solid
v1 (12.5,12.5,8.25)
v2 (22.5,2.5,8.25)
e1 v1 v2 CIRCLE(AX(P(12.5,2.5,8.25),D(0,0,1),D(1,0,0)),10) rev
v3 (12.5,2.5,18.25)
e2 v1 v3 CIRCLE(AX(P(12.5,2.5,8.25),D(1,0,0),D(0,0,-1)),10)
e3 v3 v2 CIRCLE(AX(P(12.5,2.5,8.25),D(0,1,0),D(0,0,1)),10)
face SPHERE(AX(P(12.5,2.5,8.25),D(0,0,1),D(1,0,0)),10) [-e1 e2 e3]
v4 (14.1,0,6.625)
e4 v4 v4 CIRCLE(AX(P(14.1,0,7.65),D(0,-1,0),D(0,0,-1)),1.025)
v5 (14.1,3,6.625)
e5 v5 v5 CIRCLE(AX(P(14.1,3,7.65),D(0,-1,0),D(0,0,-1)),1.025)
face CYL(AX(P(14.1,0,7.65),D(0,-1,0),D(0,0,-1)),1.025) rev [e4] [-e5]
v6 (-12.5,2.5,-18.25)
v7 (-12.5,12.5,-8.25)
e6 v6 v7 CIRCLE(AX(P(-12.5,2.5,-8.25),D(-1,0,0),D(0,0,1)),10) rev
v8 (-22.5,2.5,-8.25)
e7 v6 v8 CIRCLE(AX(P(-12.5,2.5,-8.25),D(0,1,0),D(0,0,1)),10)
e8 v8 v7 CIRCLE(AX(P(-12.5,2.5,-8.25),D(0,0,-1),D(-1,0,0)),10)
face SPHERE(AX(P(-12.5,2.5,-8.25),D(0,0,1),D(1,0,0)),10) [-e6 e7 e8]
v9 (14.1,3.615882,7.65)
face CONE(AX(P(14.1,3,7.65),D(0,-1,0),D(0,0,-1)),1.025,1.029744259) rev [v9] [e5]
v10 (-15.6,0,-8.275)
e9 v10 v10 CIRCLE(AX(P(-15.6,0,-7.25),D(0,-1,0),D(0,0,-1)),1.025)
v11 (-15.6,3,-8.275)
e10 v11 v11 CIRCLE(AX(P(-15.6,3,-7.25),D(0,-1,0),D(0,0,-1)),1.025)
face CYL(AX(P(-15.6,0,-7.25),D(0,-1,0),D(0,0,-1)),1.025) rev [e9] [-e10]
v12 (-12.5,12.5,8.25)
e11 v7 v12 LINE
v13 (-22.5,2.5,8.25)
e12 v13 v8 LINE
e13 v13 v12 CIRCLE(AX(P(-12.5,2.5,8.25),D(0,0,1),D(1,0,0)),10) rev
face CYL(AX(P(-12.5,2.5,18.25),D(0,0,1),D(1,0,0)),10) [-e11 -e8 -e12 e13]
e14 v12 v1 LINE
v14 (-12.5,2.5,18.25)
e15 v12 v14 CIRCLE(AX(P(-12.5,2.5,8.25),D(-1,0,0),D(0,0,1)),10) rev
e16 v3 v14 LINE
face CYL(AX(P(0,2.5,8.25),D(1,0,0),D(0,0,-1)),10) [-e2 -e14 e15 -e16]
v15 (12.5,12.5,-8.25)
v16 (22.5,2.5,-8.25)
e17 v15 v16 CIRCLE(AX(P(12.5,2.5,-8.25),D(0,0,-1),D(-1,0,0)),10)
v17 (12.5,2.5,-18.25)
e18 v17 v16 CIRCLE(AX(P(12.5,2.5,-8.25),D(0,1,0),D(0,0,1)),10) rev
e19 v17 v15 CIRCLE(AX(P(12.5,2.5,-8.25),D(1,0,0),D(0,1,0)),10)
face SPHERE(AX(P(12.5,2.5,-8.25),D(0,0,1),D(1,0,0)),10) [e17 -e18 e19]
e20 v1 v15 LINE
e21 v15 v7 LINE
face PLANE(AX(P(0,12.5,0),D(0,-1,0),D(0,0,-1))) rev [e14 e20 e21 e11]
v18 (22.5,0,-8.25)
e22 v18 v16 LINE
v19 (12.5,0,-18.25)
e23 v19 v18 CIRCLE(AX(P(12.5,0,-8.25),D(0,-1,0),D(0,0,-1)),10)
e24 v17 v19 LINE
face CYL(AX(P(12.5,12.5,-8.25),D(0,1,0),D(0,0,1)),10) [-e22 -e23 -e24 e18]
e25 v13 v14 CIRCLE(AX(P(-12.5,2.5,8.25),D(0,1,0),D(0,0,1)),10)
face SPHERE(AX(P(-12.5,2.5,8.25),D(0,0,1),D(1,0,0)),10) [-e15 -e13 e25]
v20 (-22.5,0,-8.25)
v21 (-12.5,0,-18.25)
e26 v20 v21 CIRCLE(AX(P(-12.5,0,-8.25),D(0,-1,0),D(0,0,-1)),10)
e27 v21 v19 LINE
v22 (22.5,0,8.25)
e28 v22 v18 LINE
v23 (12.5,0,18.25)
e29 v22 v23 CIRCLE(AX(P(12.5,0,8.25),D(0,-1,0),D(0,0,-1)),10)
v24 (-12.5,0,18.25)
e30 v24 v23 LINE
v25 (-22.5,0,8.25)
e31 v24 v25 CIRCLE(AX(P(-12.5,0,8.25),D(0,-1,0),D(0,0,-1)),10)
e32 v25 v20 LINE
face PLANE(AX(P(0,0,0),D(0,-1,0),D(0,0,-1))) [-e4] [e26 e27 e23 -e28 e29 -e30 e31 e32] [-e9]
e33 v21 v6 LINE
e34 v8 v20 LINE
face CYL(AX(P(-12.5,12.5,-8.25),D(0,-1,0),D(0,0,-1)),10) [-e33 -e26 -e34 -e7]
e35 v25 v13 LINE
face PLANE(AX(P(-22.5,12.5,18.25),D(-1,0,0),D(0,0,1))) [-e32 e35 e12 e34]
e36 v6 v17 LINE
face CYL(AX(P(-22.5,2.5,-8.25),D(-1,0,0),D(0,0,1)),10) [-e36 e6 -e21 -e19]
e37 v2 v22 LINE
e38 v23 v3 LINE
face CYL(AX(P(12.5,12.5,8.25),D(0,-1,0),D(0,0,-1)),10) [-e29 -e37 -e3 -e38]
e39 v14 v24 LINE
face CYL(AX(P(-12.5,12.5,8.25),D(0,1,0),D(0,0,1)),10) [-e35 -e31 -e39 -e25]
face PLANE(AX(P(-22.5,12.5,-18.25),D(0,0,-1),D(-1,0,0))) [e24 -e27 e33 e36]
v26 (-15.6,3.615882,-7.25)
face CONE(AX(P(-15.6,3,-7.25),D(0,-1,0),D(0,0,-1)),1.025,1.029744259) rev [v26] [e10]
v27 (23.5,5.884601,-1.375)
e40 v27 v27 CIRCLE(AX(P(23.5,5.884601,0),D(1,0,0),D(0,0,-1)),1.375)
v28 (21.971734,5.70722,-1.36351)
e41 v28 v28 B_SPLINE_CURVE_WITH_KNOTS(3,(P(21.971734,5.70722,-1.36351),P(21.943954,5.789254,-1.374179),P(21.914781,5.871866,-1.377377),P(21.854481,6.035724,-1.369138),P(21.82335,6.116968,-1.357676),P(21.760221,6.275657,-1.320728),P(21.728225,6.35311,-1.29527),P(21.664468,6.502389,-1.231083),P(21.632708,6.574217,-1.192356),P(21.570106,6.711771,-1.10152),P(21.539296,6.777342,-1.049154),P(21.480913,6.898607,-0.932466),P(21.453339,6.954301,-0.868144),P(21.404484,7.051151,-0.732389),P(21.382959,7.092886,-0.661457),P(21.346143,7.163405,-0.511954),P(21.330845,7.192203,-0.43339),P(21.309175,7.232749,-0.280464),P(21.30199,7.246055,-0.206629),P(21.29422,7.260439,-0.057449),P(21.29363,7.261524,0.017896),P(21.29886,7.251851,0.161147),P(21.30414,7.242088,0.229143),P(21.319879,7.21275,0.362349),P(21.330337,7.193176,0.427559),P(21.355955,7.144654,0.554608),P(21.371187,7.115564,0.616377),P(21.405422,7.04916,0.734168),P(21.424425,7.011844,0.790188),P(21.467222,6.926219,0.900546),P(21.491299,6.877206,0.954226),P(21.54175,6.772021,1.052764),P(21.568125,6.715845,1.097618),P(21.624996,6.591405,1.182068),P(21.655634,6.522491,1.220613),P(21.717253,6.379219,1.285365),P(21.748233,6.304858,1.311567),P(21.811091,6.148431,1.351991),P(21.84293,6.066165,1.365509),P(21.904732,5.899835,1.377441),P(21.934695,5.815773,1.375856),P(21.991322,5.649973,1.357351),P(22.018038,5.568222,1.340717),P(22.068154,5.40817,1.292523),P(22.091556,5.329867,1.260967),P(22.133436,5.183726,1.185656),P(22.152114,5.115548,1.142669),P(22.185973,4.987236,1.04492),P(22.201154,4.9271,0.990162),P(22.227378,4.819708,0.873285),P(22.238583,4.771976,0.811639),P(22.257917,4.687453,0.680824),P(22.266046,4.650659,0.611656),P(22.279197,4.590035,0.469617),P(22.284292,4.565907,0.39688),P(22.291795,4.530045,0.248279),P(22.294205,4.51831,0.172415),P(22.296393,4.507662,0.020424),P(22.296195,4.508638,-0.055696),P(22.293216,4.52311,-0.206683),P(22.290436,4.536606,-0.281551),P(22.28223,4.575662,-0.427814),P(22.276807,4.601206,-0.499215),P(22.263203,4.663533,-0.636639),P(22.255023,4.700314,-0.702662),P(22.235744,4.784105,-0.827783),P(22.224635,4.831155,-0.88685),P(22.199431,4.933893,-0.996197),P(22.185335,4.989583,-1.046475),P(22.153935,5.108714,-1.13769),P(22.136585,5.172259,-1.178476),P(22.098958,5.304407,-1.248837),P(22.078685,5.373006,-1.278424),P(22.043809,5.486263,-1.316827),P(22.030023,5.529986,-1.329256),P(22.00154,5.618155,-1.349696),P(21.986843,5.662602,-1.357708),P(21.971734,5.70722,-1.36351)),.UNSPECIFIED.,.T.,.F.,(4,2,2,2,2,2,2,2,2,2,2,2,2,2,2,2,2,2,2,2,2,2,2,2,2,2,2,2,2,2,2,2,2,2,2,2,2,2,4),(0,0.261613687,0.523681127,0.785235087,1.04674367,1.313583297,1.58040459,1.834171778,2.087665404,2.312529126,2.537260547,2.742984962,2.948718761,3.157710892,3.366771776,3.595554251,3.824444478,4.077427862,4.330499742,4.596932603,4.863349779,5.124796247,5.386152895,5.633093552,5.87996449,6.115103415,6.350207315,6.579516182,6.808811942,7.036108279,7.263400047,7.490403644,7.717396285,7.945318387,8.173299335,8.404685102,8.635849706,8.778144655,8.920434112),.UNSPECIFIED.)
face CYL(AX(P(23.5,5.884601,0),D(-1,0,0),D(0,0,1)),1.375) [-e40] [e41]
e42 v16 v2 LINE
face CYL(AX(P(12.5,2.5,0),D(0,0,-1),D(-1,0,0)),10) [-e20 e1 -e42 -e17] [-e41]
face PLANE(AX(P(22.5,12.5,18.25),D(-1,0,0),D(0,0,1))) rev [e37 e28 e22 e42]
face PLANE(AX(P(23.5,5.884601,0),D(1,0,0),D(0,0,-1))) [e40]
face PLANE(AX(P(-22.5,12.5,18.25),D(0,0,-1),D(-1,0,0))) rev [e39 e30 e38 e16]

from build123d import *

# Parameters (mm, degrees)
SKETCH1_W                          = 45
SKETCH1_H                          = 36.5
BOSS_EXTRUDE1_DEPTH                = 12.5
SKETCH2_R                          = 1.375
BOSS_EXTRUDE2_DEPTH                = 1
TAP_DRILL_FOR_M2_5X0_45_TAP1_D     = 2.05
TAP_DRILL_FOR_M2_5X0_45_TAP1_DEPTH = 3
TAP_DRILL_FOR_M2_5X0_45_TAP1_TIP   = 0.615882135
FILLET1_R                          = 10


with BuildPart() as part:
    # Sketch1 → Boss-Extrude1 (new body)
    with BuildSketch(Plane(origin=(0, 0, 0), x_dir=(1, 0, 0), z_dir=(0, 1, 0))):
        Rectangle(SKETCH1_W, SKETCH1_H)
    extrude(amount=BOSS_EXTRUDE1_DEPTH)

    # Sketch2 → Boss-Extrude2 (add)
    with BuildSketch(Plane(origin=(22.5, 0, 0), x_dir=(0, 0, -1), z_dir=(1, 0, 0))):
        with Locations(Location((0, 5.884601179, 0), (0, 0, 180))):
            Circle(SKETCH2_R)
    extrude(amount=BOSS_EXTRUDE2_DEPTH)

    # Tap Drill for M2.5x0.45 Tap1
    with Locations(Plane(origin=(0, 0, 0), x_dir=(-1, 0, 0), z_dir=(0, -1, 0))):
        with Locations((15.6, 7.25), (-14.1, -7.65)):
            Hole(TAP_DRILL_FOR_M2_5X0_45_TAP1_D / 2, depth=TAP_DRILL_FOR_M2_5X0_45_TAP1_DEPTH)
            with Locations((0, 0, -(TAP_DRILL_FOR_M2_5X0_45_TAP1_DEPTH + TAP_DRILL_FOR_M2_5X0_45_TAP1_TIP / 2))):  # 118° drill point
                Cone(0, TAP_DRILL_FOR_M2_5X0_45_TAP1_D / 2, TAP_DRILL_FOR_M2_5X0_45_TAP1_TIP, mode=Mode.SUBTRACT)

    # Fillet1
    # the kernel refuses this fillet: 10 mm, written as the material it takes off along each edge
    with BuildSketch(Plane(origin=(12.5, 2.5, 8.25), x_dir=(1, 0, 0), z_dir=(0, 0, 1))) as fillet1_piece_1_section:
        Polygon((0, 0), (FILLET1_R, 0), (FILLET1_R, FILLET1_R), (0, FILLET1_R), align=None)
    fillet1_piece_1 = extrude(amount=FILLET1_R, mode=Mode.PRIVATE)
    fillet1_piece_1 = fillet1_piece_1 - Plane(origin=(12.5, 2.5, 8.25), x_dir=(-0.7071067811865475, -0.7071067811865475, 0), z_dir=(0, 0, 1)) * Sphere(FILLET1_R, mode=Mode.PRIVATE)
    add(fillet1_piece_1, mode=Mode.SUBTRACT)
    with BuildSketch(Plane(origin=(12.5, 2.5, -8.25), x_dir=(0, 1, 0), z_dir=(1, 0, 0))) as fillet1_piece_2_section:
        Polygon((0, 0), (FILLET1_R, 0), (FILLET1_R, -FILLET1_R), (0, -FILLET1_R), align=None)
    fillet1_piece_2 = extrude(amount=FILLET1_R, mode=Mode.PRIVATE)
    fillet1_piece_2 = fillet1_piece_2 - Plane(origin=(12.5, 2.5, -8.25), x_dir=(0, -0.7071067811865475, 0.7071067811865475), z_dir=(1, 0, 0)) * Sphere(FILLET1_R, mode=Mode.PRIVATE)
    add(fillet1_piece_2, mode=Mode.SUBTRACT)
    with BuildSketch(Plane(origin=(-12.5, 2.5, 8.25), x_dir=(-1, 0, 0), z_dir=(0, 0, 1))) as fillet1_piece_3_section:
        Polygon((0, 0), (FILLET1_R, 0), (FILLET1_R, -FILLET1_R), (0, -FILLET1_R), align=None)
    fillet1_piece_3 = extrude(amount=FILLET1_R, mode=Mode.PRIVATE)
    fillet1_piece_3 = fillet1_piece_3 - Plane(origin=(-12.5, 2.5, 8.25), x_dir=(0.7071067811865475, -0.7071067811865475, 0), z_dir=(0, 0, 1)) * Sphere(FILLET1_R, mode=Mode.PRIVATE)
    add(fillet1_piece_3, mode=Mode.SUBTRACT)
    with BuildSketch(Plane(origin=(-12.5, 2.5, -8.25), x_dir=(0, 1, 0), z_dir=(-1, 0, 0))) as fillet1_piece_4_section:
        Polygon((0, 0), (FILLET1_R, 0), (FILLET1_R, FILLET1_R), (0, FILLET1_R), align=None)
    fillet1_piece_4 = extrude(amount=FILLET1_R, mode=Mode.PRIVATE)
    fillet1_piece_4 = fillet1_piece_4 - Plane(origin=(-12.5, 2.5, -8.25), x_dir=(0, -0.7071067811865475, 0.7071067811865475), z_dir=(-1, 0, 0)) * Sphere(FILLET1_R, mode=Mode.PRIVATE)
    add(fillet1_piece_4, mode=Mode.SUBTRACT)
    with BuildSketch(Plane(origin=(22.5, 12.5, 8.25), x_dir=(0, -1, 0), z_dir=(0, 0, -1))) as fillet1_piece_5_section:
        with BuildLine():
            CenterArc((FILLET1_R, FILLET1_R), FILLET1_R, 180, 90)
            Line((0, FILLET1_R), (0, 0))
            Line((0, 0), (FILLET1_R, 0))
        make_face()
    fillet1_piece_5 = extrude(amount=16.5, mode=Mode.PRIVATE)
    fillet1_piece_5 = fillet1_piece_5 - Plane(origin=(20.212473713, 5.884601179, 0), x_dir=(0, 0, 1), z_dir=(-1, 0, 0)) * Cylinder(1.375, 73, mode=Mode.PRIVATE)
    add(fillet1_piece_5, mode=Mode.SUBTRACT)
    with BuildSketch(Plane(origin=(-12.5, 12.5, 18.25), x_dir=(0, -1, 0), z_dir=(1, 0, 0))) as fillet1_piece_6:
        with BuildLine():
            CenterArc((FILLET1_R, FILLET1_R), FILLET1_R, 180, 90)
            Line((0, FILLET1_R), (0, 0))
            Line((0, 0), (FILLET1_R, 0))
        make_face()
    extrude(amount=25, mode=Mode.SUBTRACT)
    with BuildSketch(Plane(origin=(-22.5, 12.5, -8.25), x_dir=(0, -1, 0), z_dir=(0, 0, 1))) as fillet1_piece_7:
        with BuildLine():
            CenterArc((FILLET1_R, FILLET1_R), FILLET1_R, 180, 90)
            Line((0, FILLET1_R), (0, 0))
            Line((0, 0), (FILLET1_R, 0))
        make_face()
    extrude(amount=16.5, mode=Mode.SUBTRACT)
    with BuildSketch(Plane(origin=(12.5, 12.5, -18.25), x_dir=(0, 0, 1), z_dir=(-1, 0, 0))) as fillet1_piece_8:
        with BuildLine():
            CenterArc((FILLET1_R, -FILLET1_R), FILLET1_R, 90, 90)
            Line((0, -FILLET1_R), (0, 0))
            Line((0, 0), (FILLET1_R, 0))
        make_face()
    extrude(amount=25, mode=Mode.SUBTRACT)
    with BuildSketch(Plane(origin=(-22.5, -25, 18.25), x_dir=(1, 0, 0), z_dir=(0, 1, 0)), Plane(origin=(-22.5, -25, -18.25), x_dir=(0, 0, 1), z_dir=(0, 1, 0))) as fillet1_piece_9:
        with BuildLine():
            CenterArc((FILLET1_R, FILLET1_R), FILLET1_R, 180, 90)
            Line((0, FILLET1_R), (0, 0))
            Line((0, 0), (FILLET1_R, 0))
        make_face()
    extrude(amount=27.5, mode=Mode.SUBTRACT)
    with BuildSketch(Plane(origin=(22.5, -25, 18.25), x_dir=(-1, 0, 0), z_dir=(0, 1, 0)), Plane(origin=(22.5, -25, -18.25), x_dir=(0, 0, 1), z_dir=(0, 1, 0))) as fillet1_piece_10:
        with BuildLine():
            CenterArc((FILLET1_R, -FILLET1_R), FILLET1_R, 90, 90)
            Line((0, -FILLET1_R), (0, 0))
            Line((0, 0), (FILLET1_R, 0))
        make_face()
    extrude(amount=27.5, mode=Mode.SUBTRACT)


solid = part.part
